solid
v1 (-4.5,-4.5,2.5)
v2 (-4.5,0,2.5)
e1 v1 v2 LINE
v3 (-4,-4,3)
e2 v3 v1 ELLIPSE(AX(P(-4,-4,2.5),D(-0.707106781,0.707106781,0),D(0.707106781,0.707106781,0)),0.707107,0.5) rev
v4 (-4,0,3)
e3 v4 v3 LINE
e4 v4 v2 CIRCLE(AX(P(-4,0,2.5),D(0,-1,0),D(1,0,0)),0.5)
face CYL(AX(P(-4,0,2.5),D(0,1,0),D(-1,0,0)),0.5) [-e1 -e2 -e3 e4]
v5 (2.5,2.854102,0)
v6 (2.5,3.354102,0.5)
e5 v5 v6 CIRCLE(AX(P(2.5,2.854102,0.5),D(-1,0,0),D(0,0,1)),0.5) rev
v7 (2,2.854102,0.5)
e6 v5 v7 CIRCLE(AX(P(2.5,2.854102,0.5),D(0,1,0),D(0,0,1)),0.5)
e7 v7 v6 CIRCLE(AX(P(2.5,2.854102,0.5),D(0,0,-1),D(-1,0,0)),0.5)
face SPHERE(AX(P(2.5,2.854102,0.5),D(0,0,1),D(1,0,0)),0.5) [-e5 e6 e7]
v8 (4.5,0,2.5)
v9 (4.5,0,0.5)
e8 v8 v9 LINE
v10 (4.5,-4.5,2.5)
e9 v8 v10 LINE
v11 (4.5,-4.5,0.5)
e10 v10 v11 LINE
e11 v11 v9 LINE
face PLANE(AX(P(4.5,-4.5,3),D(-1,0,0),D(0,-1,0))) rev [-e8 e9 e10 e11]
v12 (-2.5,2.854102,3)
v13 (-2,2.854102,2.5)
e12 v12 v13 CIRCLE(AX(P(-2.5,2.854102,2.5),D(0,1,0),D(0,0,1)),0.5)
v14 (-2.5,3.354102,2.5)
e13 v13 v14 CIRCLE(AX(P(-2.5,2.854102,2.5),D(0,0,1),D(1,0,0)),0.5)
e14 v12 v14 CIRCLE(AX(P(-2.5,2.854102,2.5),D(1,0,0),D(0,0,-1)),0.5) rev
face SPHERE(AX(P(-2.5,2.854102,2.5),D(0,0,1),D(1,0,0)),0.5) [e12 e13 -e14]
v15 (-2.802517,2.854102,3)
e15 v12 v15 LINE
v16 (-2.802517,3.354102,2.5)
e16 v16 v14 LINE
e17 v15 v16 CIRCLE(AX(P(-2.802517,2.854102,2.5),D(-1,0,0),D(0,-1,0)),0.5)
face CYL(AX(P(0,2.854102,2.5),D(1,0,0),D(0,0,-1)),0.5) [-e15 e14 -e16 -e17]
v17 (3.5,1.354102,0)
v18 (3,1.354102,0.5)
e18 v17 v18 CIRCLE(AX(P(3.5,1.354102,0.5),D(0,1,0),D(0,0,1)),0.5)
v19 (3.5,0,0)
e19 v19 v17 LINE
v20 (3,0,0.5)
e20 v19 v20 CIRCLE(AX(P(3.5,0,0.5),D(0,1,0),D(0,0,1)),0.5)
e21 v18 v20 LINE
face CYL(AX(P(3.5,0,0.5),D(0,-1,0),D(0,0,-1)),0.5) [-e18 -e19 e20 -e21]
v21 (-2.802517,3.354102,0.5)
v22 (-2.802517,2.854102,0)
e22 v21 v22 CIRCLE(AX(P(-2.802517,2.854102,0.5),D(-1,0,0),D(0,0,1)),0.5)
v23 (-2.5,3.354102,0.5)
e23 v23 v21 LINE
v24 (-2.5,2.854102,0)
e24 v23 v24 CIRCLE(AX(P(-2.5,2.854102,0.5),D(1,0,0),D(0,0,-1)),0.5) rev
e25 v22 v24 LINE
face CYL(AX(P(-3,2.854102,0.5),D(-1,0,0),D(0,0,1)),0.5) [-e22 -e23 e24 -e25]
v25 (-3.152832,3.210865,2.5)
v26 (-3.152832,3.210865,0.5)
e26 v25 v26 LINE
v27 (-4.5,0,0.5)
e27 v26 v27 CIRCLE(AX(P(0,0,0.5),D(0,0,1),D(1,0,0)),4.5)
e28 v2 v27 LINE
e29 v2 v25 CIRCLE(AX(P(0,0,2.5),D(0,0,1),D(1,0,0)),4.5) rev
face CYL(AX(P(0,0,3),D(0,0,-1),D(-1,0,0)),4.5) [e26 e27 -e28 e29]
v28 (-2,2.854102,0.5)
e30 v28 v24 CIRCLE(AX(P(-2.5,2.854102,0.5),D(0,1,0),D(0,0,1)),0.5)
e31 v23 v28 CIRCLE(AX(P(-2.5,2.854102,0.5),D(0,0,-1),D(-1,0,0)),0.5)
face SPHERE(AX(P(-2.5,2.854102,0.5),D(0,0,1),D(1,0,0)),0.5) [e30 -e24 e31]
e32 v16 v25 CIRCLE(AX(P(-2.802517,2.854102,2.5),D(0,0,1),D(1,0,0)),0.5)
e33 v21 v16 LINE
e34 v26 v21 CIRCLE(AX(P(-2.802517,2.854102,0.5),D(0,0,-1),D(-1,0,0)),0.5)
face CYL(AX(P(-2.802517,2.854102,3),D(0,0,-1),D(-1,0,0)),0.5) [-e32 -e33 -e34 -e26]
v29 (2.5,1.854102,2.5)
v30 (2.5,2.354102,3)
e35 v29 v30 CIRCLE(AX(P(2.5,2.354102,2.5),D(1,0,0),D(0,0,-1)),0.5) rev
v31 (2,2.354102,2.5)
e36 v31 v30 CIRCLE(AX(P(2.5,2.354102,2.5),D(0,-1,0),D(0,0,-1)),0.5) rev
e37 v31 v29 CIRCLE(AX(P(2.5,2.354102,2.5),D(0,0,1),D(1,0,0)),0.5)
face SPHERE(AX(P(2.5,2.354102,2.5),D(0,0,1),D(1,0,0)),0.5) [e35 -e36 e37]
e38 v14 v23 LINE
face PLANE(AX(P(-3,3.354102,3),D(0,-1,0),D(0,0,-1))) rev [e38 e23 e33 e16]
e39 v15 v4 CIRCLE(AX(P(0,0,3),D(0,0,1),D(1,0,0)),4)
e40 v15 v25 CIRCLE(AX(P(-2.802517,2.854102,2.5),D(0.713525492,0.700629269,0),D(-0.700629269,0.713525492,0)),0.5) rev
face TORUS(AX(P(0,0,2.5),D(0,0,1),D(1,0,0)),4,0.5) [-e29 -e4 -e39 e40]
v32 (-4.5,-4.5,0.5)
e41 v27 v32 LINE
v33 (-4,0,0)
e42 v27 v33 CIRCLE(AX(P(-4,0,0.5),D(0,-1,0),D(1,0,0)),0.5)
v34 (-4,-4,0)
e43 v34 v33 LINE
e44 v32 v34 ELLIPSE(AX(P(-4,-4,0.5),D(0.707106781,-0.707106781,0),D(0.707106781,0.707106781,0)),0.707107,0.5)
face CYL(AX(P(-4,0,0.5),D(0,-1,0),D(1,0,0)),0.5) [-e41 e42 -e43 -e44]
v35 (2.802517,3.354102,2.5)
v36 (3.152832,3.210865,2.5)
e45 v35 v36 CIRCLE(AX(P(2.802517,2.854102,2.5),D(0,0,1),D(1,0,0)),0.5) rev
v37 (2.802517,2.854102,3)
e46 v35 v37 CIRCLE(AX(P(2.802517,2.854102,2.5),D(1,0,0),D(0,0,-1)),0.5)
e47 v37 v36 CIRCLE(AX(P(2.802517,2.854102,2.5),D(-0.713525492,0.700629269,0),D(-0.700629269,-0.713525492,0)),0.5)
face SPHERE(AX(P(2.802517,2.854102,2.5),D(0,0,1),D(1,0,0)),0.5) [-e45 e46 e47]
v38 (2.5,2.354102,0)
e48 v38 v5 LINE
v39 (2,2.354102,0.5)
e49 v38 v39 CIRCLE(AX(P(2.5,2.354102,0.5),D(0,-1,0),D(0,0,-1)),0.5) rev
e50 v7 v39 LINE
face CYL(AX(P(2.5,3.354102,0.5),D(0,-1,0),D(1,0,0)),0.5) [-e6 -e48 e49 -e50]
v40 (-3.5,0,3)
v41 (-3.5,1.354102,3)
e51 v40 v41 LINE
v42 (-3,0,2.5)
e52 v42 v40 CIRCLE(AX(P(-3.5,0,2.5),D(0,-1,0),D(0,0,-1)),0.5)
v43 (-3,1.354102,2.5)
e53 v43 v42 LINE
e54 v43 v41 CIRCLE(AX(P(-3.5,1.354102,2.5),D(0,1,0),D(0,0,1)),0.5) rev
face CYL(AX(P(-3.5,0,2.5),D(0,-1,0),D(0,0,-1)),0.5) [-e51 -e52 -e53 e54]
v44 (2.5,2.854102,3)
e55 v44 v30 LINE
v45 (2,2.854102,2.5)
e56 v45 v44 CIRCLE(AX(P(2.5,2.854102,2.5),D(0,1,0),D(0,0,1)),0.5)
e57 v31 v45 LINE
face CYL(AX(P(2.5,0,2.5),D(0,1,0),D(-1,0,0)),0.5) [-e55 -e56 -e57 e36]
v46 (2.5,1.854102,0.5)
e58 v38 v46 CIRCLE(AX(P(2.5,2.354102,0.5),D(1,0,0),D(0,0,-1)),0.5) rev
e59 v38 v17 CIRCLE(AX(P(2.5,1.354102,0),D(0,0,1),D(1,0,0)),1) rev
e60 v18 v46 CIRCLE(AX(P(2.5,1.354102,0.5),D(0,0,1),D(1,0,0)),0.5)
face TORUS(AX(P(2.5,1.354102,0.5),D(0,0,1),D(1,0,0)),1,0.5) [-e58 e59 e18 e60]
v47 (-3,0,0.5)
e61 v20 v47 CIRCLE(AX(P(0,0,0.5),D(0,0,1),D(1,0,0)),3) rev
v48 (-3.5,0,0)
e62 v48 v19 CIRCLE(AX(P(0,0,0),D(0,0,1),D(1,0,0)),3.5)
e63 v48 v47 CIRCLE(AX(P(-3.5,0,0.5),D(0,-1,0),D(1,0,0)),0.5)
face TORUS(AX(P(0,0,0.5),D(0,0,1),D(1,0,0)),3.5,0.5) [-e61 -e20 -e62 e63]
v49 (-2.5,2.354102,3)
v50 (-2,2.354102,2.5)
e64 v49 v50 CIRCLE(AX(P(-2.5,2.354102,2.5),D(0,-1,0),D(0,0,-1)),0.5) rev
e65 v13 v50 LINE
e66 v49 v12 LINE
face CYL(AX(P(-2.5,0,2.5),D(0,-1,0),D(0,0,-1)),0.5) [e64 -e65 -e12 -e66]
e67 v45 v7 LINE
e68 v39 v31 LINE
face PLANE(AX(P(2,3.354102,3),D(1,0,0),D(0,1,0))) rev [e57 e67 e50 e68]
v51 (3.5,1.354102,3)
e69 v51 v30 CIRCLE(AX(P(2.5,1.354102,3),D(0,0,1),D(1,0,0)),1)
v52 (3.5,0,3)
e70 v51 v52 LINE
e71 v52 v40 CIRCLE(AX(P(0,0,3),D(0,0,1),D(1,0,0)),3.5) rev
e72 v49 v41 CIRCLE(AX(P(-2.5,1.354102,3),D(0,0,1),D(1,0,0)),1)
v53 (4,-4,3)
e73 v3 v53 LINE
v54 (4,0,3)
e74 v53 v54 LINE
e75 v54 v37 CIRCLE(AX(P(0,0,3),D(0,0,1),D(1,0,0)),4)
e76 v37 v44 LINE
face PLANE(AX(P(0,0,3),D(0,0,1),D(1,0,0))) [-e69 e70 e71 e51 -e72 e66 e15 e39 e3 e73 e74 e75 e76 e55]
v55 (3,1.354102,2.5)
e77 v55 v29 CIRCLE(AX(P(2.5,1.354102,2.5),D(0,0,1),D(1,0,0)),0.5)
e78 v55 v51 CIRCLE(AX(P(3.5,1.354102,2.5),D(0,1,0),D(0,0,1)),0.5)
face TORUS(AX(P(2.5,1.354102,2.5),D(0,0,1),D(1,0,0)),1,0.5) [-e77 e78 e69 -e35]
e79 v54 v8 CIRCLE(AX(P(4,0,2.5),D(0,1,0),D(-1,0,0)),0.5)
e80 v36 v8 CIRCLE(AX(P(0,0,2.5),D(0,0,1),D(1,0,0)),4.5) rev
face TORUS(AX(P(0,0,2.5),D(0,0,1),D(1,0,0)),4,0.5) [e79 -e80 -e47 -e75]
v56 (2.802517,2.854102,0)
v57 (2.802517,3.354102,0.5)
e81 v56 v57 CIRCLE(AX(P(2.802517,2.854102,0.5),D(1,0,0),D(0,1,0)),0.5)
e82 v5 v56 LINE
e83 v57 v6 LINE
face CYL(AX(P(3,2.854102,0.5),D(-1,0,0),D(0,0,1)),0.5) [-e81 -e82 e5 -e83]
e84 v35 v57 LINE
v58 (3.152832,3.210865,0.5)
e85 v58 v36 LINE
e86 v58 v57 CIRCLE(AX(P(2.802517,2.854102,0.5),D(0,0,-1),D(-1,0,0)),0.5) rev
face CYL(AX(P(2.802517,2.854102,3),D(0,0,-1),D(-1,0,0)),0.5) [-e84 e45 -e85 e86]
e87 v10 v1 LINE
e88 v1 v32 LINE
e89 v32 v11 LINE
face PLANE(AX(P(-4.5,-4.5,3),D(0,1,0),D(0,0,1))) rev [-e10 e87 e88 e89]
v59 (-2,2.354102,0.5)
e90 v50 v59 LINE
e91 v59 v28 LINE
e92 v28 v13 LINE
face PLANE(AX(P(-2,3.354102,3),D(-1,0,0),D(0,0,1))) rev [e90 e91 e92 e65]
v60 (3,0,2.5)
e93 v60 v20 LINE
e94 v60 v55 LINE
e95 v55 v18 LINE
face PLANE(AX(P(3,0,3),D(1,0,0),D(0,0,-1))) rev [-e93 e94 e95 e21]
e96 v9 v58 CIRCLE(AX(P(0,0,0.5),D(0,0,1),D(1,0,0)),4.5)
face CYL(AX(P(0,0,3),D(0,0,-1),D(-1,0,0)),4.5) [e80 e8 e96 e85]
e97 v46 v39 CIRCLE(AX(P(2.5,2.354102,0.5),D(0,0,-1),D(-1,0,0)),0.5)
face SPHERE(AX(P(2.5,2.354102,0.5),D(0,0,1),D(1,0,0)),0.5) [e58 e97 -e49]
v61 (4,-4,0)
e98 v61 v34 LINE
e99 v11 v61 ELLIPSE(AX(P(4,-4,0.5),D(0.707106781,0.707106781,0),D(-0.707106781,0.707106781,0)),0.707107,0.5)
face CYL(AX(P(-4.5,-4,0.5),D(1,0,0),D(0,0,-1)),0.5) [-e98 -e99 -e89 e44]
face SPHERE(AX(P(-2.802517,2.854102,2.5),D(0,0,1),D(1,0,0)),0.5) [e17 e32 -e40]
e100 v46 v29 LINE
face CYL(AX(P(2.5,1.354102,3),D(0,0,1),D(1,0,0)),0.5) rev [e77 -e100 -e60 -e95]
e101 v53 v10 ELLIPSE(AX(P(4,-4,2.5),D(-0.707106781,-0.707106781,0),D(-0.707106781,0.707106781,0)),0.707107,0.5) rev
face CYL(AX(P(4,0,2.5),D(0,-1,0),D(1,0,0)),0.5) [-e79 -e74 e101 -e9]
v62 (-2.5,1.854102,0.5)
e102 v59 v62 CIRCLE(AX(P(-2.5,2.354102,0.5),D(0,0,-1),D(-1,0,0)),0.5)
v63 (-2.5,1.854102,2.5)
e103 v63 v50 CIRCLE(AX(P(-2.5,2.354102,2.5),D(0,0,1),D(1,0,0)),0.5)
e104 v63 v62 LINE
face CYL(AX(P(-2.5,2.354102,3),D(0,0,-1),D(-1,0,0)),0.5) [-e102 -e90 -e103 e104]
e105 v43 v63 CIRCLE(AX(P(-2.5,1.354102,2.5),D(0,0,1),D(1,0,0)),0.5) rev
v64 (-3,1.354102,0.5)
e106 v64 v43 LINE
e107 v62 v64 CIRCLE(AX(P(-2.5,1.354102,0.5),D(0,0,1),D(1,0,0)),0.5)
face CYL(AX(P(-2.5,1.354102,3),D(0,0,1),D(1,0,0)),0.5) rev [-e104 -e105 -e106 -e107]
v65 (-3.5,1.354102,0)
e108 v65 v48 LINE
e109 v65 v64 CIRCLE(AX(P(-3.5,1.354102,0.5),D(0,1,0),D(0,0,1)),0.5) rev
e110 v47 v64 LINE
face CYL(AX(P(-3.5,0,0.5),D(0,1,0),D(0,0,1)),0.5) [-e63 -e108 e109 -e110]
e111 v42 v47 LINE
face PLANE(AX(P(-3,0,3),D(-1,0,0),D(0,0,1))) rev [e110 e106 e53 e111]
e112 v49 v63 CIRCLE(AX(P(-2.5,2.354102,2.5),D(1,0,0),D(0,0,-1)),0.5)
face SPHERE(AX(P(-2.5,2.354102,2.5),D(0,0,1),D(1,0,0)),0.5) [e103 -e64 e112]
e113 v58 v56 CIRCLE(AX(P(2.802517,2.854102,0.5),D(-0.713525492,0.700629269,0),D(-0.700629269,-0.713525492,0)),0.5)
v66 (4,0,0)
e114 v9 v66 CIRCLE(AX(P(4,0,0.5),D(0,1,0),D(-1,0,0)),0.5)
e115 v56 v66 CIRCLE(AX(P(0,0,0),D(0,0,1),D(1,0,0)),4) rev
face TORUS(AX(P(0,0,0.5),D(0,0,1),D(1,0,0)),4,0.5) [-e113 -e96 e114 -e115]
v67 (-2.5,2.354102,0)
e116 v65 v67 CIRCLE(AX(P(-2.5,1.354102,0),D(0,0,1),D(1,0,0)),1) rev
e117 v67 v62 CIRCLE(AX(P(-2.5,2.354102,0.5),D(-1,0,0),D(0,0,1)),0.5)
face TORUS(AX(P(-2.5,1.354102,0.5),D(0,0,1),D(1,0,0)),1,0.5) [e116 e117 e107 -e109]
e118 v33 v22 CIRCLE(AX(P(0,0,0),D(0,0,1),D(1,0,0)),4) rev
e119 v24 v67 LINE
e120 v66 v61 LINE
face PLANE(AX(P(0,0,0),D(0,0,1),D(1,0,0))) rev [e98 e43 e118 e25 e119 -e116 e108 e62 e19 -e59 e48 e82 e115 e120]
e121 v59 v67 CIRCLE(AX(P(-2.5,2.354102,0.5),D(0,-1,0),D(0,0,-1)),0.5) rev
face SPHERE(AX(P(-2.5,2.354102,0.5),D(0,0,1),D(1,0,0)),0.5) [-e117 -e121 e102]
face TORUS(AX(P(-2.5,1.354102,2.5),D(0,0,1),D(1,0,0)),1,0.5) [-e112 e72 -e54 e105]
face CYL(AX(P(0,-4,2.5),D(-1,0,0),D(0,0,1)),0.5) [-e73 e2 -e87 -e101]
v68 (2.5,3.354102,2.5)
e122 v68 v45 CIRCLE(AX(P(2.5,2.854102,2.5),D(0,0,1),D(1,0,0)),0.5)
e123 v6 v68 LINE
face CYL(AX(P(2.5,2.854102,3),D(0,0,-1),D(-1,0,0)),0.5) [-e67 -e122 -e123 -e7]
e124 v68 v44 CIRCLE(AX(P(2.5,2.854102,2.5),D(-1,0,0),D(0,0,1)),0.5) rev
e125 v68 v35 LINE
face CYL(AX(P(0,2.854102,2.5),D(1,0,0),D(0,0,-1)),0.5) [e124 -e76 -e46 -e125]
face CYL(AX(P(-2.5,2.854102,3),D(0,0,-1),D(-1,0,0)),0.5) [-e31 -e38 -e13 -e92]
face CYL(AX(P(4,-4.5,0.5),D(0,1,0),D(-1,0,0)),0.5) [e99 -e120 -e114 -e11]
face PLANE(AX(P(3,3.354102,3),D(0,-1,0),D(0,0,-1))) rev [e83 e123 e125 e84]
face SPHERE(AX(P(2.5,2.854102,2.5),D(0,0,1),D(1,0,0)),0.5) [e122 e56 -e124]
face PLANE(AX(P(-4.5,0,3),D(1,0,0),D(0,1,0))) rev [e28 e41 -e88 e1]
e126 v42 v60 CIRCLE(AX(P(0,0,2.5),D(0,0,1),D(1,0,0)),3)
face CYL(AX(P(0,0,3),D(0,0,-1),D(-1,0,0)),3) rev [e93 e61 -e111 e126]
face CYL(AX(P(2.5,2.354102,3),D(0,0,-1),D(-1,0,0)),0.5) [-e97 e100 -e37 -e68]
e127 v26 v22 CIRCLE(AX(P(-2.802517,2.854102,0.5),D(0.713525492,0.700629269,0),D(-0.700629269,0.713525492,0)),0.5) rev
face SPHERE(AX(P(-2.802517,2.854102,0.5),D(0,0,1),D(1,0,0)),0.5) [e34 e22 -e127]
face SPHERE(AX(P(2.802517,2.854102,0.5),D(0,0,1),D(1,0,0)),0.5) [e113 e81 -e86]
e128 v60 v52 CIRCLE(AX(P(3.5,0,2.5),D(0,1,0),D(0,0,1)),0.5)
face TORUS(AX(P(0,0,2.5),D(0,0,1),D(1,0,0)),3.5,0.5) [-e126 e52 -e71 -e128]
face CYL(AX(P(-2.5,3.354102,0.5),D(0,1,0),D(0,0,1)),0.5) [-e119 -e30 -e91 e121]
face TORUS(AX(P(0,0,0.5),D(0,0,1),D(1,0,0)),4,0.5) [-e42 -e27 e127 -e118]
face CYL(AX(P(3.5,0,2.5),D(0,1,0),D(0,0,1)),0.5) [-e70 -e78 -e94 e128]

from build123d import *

# Parameters (mm, degrees)
EXTRUDE_1_DEPTH = 3
FILLET_1_R      = 0.5


with BuildPart() as part:
    # Эскиз1 → Бобышка-Вытянуть1 (new body)
    with BuildSketch(Plane.XY):
        with BuildLine():
            Line((-3, 0), (-3, 1.854101966))
            Line((-3, 1.854101966), (-2, 1.854101966))
            Line((-2, 1.854101966), (-2, 3.354101966))
            Line((-2, 3.354101966), (-3, 3.354101966))
            ThreePointArc((-3, 3.354101966), (-4.107919181, 1.837117307), (-4.5, 0))
            Line((-4.5, 0), (-4.5, -4.5))
            Line((-4.5, -4.5), (4.5, -4.5))
            Line((4.5, -4.5), (4.5, 0))
            ThreePointArc((4.5, 0), (4.107919181, 1.837117307), (3, 3.354101966))
            Line((3, 3.354101966), (2, 3.354101966))
            Line((2, 3.354101966), (2, 1.854101966))
            Line((2, 1.854101966), (3, 1.854101966))
            Line((3, 1.854101966), (3, 0))
            ThreePointArc((3, 0), (0, -3), (-3, 0))
        make_face()
    extrude(amount=EXTRUDE_1_DEPTH)

    # Скругление1
    fillet_1_edges = [part.edges().sort_by_distance(p)[0] for p in [
        (3, 1.854101966, 1.5),
        (-3, 1.854101966, 1.5),
    ]]
    fillet(fillet_1_edges, radius=FILLET_1_R)
    fillet_1_2_edges = [part.edges().sort_by_distance(p)[0] for p in [
        (3, 3.354101966, 1.5),
        (-4.5, -2.25, 0),
        (0, -4.5, 0),
        (4.5, -2.25, 0),
        (4.107919181, 1.837117307, 0),
        (2.5, 3.354101966, 0),
        (0, -3, 0),
        (-3, 0.677050983, 0),
        (-2, 2.604101966, 0),
        (-2.5, 3.354101966, 0),
        (-4.107919181, 1.837117307, 0),
        (3, 0.677050983, 0),
        (-2.5, 3.354101966, 3),
        (-2, 2.604101966, 3),
        (-3, 0.677050983, 3),
        (0, -3, 3),
        (3, 0.677050983, 3),
        (2.5, 3.354101966, 3),
        (4.107919181, 1.837117307, 3),
        (4.5, -2.25, 3),
        (0, -4.5, 3),
        (-4.5, -2.25, 3),
        (-4.107919181, 1.837117307, 3),
        (2, 3.354101966, 1.5),
        (2, 2.604101966, 3),
        (2, 1.854101966, 1.5),
        (2, 2.604101966, 0),
        (-3, 3.354101966, 1.5),
        (-2, 3.354101966, 1.5),
        (-2, 1.854101966, 1.5),
        (2.853553391, 1.707655357, 3),
        (-2.853553391, 1.707655357, 3),
        (2.853553391, 1.707655357, 0),
        (-2.853553391, 1.707655357, 0),
    ]]
    fillet(fillet_1_2_edges, radius=FILLET_1_R - 0.0001)  # a hair under: the kernel refuses the full size


solid = part.part
